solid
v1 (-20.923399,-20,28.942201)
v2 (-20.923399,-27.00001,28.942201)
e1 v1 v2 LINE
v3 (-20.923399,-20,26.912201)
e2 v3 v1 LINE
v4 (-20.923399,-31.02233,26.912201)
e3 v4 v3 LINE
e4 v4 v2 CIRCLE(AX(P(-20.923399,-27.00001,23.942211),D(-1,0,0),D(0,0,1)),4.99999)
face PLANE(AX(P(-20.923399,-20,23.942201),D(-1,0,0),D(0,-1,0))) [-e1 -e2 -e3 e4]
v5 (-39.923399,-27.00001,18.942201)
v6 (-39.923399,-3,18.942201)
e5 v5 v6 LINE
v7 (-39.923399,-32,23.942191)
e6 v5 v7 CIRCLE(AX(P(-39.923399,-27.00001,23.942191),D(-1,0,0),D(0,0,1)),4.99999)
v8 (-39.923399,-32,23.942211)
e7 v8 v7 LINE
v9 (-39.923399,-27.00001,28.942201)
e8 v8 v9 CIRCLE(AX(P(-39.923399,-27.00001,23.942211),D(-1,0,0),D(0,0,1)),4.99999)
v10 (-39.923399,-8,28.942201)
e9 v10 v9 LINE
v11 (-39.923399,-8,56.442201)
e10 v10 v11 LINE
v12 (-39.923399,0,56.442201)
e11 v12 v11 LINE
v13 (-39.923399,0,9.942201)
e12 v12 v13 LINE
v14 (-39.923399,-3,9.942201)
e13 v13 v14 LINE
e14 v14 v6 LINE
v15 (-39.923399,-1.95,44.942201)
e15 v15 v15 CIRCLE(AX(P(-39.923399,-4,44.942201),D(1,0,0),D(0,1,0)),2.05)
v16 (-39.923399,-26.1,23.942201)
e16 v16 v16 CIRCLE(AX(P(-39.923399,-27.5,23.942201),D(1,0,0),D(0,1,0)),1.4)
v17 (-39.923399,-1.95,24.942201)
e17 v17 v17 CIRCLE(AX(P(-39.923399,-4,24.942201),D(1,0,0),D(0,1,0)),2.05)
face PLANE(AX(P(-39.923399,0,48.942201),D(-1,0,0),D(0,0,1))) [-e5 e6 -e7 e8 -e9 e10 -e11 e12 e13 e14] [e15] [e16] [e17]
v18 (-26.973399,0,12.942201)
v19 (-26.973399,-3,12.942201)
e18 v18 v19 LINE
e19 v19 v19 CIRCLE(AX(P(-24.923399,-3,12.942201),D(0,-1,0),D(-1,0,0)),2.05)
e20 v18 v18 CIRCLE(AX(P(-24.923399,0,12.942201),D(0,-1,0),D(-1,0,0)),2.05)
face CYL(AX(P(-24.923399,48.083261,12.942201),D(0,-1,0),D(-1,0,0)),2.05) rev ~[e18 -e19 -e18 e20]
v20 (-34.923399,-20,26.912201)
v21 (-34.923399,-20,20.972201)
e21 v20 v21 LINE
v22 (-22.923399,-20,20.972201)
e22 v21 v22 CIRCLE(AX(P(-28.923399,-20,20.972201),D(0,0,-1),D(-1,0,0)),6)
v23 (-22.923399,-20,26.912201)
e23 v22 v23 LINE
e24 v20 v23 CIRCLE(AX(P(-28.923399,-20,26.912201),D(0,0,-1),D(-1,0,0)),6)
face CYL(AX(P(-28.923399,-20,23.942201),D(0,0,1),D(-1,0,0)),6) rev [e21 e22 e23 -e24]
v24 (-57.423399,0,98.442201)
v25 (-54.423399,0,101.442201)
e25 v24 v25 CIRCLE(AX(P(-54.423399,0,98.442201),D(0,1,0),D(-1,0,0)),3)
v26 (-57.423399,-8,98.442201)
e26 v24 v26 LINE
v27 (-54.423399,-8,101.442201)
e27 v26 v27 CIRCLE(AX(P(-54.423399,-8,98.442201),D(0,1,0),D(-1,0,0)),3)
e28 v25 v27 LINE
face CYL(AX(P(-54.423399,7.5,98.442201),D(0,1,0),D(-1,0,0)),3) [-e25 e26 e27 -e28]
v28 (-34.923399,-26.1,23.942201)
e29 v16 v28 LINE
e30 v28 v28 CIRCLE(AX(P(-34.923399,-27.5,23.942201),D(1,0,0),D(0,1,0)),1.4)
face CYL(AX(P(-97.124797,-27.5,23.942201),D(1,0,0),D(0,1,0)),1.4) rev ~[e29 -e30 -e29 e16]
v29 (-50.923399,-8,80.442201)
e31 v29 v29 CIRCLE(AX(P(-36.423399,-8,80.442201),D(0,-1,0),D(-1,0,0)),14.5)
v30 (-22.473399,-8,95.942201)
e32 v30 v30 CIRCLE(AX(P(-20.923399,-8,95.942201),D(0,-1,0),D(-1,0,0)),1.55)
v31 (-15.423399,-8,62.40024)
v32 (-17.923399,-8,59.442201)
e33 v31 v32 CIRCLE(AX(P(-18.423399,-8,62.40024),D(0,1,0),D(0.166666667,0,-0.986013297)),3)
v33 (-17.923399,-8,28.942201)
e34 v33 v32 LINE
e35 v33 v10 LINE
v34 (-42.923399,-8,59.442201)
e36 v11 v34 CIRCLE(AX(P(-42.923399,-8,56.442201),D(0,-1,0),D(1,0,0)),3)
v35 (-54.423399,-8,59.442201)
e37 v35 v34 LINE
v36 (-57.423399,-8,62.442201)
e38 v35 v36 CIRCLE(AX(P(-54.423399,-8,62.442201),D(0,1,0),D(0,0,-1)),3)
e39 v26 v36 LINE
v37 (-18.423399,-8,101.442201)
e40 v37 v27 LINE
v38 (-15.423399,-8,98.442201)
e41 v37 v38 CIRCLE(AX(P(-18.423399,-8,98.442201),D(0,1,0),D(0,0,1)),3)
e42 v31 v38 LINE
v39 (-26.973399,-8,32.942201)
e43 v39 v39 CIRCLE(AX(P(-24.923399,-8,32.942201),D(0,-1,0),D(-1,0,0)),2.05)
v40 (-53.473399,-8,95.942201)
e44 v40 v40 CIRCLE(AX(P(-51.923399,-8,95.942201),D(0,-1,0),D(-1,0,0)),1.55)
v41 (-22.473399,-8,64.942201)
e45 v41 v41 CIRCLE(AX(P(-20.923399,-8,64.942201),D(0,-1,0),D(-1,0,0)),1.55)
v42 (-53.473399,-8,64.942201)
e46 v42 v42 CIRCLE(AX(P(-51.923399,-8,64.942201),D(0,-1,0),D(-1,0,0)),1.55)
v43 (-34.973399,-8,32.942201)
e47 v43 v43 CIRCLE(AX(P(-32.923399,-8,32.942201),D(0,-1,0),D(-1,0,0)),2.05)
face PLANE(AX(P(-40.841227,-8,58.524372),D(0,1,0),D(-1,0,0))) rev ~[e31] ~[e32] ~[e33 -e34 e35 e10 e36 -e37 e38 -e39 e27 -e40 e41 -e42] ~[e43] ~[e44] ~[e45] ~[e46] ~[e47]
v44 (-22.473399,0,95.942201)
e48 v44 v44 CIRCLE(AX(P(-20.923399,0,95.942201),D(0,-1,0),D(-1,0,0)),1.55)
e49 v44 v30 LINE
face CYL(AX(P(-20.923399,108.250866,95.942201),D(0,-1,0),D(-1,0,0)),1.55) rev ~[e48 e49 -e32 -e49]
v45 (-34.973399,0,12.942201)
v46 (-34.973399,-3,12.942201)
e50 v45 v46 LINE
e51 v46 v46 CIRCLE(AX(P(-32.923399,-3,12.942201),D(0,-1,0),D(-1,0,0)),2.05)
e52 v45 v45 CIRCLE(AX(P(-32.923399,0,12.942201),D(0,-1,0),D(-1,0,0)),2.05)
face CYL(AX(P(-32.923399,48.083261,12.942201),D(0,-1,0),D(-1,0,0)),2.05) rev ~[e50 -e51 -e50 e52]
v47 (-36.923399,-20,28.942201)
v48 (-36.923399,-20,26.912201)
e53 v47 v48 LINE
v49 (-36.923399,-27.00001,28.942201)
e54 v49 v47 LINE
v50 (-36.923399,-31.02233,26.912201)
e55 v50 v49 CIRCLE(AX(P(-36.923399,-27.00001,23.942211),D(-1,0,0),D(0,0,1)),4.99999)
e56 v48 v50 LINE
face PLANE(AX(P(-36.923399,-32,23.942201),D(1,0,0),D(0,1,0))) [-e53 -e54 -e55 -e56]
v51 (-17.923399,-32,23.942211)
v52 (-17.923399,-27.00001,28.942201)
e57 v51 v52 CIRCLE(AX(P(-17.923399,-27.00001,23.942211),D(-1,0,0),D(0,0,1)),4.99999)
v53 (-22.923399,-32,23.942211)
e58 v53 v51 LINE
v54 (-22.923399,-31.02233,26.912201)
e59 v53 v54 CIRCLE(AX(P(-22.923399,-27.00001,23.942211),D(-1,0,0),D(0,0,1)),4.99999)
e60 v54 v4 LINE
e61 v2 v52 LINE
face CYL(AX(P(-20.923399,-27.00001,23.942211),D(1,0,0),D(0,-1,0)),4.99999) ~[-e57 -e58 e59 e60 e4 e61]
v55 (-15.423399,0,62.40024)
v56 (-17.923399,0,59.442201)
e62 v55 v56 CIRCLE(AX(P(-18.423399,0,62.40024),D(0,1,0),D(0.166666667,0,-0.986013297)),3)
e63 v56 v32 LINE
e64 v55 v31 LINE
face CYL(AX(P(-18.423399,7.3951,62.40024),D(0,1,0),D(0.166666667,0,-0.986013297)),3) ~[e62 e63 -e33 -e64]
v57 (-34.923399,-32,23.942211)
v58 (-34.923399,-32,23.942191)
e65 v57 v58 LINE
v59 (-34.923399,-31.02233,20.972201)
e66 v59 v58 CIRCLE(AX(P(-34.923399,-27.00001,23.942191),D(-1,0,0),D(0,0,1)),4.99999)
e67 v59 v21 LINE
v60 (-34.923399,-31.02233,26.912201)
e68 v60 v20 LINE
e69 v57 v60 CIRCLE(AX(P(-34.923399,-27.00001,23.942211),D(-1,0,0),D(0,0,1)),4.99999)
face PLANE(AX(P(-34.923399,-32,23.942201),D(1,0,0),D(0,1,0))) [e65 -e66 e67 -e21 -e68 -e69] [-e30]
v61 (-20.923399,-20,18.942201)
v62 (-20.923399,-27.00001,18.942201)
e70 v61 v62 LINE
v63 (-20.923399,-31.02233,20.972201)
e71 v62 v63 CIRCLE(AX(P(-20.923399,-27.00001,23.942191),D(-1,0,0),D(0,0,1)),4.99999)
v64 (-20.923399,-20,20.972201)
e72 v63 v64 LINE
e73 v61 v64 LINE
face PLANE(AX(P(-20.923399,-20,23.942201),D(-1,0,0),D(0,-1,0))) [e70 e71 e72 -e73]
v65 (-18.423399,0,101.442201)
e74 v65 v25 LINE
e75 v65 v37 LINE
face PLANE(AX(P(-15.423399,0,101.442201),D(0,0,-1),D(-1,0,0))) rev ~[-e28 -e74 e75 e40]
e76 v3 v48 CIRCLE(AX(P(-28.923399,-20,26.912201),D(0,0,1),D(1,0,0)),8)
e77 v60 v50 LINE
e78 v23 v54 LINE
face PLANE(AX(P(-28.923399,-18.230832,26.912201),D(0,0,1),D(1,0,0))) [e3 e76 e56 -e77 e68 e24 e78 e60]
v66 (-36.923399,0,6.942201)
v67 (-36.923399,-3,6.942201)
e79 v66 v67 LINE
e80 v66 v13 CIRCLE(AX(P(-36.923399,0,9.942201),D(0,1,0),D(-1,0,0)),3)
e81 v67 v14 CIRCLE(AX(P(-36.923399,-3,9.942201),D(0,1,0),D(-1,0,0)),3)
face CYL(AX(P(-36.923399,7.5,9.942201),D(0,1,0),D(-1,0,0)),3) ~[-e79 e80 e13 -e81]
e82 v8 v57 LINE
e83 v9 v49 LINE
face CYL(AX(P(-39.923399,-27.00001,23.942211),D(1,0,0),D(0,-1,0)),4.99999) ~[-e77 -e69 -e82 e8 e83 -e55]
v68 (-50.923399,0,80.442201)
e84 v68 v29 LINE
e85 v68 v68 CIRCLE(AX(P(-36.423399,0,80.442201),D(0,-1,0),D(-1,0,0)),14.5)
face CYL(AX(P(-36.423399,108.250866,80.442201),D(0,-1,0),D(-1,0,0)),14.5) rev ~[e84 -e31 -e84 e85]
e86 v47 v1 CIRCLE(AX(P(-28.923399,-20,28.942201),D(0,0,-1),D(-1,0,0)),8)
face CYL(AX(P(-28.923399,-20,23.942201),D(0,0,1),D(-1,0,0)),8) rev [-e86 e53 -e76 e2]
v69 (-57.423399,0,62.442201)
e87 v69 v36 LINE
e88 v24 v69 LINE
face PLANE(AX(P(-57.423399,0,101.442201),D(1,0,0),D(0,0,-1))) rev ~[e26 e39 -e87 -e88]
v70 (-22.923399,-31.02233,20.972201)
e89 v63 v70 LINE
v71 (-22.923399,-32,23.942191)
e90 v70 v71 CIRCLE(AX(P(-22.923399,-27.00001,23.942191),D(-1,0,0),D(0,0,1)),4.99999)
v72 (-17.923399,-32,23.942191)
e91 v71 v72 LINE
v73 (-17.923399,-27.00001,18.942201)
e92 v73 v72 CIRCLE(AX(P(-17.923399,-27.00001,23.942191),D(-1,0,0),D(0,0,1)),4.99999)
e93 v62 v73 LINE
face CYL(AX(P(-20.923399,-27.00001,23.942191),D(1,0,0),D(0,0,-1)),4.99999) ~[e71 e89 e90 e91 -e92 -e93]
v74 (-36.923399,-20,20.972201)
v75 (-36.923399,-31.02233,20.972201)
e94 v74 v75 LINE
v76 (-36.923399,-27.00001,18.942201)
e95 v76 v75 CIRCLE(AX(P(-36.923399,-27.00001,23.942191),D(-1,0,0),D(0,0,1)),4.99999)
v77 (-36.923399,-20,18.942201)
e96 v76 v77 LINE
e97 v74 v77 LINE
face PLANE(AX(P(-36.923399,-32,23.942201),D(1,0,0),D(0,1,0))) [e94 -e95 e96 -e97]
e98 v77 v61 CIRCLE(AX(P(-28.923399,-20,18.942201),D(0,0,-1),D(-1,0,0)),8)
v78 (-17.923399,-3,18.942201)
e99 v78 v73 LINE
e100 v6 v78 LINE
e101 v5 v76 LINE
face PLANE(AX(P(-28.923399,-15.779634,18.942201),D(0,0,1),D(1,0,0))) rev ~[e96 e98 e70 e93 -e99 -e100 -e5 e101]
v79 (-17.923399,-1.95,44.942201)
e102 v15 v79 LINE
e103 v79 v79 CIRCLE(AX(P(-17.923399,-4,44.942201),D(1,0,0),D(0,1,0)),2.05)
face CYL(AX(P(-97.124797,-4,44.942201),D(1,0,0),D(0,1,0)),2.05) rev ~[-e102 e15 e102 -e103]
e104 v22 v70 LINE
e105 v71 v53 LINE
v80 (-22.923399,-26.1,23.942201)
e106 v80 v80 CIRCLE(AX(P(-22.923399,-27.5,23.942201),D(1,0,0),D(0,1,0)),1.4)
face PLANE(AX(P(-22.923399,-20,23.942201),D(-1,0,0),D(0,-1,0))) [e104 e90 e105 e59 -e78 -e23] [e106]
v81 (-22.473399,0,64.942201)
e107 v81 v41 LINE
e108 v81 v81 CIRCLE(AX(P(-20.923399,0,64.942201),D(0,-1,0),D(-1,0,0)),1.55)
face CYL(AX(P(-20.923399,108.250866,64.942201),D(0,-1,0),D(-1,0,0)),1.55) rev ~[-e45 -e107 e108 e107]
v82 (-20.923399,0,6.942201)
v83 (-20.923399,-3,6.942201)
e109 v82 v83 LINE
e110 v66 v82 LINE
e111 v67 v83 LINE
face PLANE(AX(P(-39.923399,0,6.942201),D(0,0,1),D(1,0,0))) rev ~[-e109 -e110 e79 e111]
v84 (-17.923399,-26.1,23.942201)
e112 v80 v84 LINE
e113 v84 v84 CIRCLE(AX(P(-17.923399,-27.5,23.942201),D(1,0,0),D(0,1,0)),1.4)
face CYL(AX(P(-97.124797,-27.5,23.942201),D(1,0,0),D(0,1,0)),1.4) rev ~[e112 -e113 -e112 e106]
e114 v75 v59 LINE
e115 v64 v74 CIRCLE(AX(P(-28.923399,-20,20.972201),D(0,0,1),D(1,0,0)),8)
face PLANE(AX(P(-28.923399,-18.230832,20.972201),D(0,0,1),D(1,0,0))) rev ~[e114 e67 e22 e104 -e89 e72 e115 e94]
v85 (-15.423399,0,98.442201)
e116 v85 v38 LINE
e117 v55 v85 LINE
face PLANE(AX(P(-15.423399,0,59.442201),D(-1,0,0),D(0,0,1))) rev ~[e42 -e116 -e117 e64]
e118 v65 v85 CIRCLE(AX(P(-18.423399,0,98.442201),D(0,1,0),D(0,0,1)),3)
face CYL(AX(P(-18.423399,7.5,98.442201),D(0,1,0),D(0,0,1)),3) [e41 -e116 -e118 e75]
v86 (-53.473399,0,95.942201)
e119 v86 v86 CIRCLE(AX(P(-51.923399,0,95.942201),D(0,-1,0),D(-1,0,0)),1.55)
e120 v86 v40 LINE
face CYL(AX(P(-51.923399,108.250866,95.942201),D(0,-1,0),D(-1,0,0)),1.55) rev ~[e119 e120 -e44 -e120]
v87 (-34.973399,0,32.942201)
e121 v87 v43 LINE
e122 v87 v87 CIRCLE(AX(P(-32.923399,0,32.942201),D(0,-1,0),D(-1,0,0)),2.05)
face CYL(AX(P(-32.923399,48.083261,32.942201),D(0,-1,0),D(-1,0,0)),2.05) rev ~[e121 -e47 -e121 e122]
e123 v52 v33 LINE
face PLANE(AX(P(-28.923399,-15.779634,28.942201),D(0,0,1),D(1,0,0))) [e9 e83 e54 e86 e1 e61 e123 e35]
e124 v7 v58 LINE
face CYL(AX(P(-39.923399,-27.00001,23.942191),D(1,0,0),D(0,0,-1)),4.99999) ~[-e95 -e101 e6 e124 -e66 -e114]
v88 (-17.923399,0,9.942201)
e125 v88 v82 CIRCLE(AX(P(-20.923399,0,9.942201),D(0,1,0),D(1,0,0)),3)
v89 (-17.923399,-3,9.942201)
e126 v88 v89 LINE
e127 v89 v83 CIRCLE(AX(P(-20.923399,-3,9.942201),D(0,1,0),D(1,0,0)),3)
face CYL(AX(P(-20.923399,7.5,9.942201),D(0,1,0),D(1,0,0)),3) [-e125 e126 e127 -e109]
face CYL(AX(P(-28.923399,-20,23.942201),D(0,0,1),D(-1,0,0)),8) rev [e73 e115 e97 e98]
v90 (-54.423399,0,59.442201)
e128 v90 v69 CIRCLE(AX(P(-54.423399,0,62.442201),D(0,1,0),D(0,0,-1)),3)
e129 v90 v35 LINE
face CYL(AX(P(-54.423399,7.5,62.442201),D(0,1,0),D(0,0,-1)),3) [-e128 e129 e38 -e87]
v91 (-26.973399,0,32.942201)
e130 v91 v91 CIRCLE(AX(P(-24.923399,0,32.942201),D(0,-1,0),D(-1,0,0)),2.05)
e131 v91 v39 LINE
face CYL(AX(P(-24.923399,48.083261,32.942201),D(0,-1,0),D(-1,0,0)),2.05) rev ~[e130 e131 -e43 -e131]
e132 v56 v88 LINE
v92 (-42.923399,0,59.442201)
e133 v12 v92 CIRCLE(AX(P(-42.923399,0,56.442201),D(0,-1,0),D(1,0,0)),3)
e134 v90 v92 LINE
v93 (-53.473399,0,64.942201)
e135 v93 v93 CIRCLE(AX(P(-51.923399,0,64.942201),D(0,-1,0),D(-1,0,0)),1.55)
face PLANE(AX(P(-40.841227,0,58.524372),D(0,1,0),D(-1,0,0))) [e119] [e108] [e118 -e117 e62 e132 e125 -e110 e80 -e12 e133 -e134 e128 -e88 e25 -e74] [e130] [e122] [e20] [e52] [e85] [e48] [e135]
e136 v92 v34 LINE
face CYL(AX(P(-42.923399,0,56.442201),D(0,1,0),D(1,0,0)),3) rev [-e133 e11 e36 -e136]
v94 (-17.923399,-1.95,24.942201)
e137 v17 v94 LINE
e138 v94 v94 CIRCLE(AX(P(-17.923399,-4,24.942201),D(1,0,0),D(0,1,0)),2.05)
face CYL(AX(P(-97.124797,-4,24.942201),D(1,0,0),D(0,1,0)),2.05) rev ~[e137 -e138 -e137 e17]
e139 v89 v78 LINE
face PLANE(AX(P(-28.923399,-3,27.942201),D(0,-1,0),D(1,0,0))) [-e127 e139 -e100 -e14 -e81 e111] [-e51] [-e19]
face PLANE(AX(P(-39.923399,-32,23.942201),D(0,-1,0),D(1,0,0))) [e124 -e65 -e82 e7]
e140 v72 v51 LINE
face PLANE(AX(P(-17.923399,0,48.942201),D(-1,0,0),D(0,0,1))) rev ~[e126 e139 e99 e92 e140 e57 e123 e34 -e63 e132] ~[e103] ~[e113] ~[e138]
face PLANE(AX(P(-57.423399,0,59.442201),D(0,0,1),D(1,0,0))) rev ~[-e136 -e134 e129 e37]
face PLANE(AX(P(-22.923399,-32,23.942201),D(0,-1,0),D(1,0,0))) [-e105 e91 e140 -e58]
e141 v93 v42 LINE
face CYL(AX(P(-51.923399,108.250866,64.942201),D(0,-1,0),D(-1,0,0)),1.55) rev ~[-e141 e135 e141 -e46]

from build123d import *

# Parameters (mm, degrees)
F0_W          = 22
F0_H          = 42
F1_DEPTH      = 3
F2_W          = 3
F2_H          = 30
F2_W_2        = 5
F3_DEPTH      = 22
F4_D          = 4.1
F7_DEPTH      = 5
F8_DEPTH      = 2.97
F9_R          = 4.99999
F11_D         = 4.1
F12_D         = 2.8
F13_W         = 22
F13_H         = 10.5
F14_DEPTH     = 8
F15_T1_DEPTH  = 8
F15_T3_DEPTH  = 18
F15_T5_DEPTH  = 18
F15_T7_DEPTH  = 22.7901994578
F15_T9_DEPTH  = 23
F15_T11_DEPTH = 23
F15_T13_DEPTH = 23
F16_D         = 29
F17_D         = 3.1


# Not quite as in the source:
# - a fillet or chamfer that OpenCascade refuses, or shapes differently, is made with other operations: its cross-section is extruded or revolved along the edge and cut away or added
# - a fillet or chamfer is up to 0.001 mm smaller than in the source, because OpenCascade refuses the exact size


with BuildPart() as f1:
    # F0 (on Front) → F1 (new body)
    with BuildSketch(Plane.XZ):
        with Locations((-28.9233987555, 27.9422005266)):
            Rectangle(F0_W, F0_H)
    extrude(amount=F1_DEPTH)

    # F2 (on face) → F3 (join)
    with BuildSketch(Plane(origin=(-39.9233987555, 0, 0), x_dir=(0, -1, 0), z_dir=(-1, 0, 0))):
        with Locations((1.5, 33.9422005266)):
            Rectangle(F2_W, F2_H)
        with Locations((5.5, 33.9422005266)):
            Rectangle(F2_W_2, F2_H)
    extrude(amount=-F3_DEPTH)

    # F4 (through all)
    with Locations(Plane(origin=(0, 0, 0), x_dir=(1, 0, 0), z_dir=(0, 1, 0))):
        with Locations((-24.9233987555, -12.9422005266), (-32.9233987555, -12.9422005266), (-32.9233987555, -32.9422005266), (-24.9233987555, -32.9422005266)):
            Hole(F4_D / 2)

    # F6 (on line) → F7 (join, symmetric)
    with BuildSketch(Plane.XY.offset(23.9422005266)):
        with BuildLine():
            ThreePointArc((-36.9233987555, -20), (-28.9233987555, -12), (-20.9233987555, -20))
            Line((-20.9233987555, -20), (-20.9233987555, -32))
            Line((-20.9233987555, -32), (-17.9233987555, -32))
            Line((-17.9233987555, -32), (-17.9233987555, 0))
            Line((-17.9233987555, 0), (-39.9233987555, 0))
            Line((-39.9233987555, 0), (-39.9233987555, -32))
            Line((-39.9233987555, -32), (-36.9233987555, -32))
            Line((-36.9233987555, -32), (-36.9233987555, -20))
        make_face()
    extrude(amount=F7_DEPTH, both=True)

    # F6 (on line) → F8 (join, symmetric)
    with BuildSketch(Plane.XY.offset(23.9422005266)):
        with BuildLine():
            ThreePointArc((-34.9233987555, -20), (-28.9233987555, -14), (-22.9233987555, -20))
            Line((-22.9233987555, -20), (-22.9233987555, -25.2915026221))
            ThreePointArc((-22.9233987555, -25.2915026221), (-21.4400839819, -22.8284271247), (-20.9233987555, -20))
            ThreePointArc((-20.9233987555, -20), (-28.9233987555, -12), (-36.9233987555, -20))
            ThreePointArc((-36.9233987555, -20), (-36.406713529, -22.8284271247), (-34.9233987555, -25.2915026221))
            Line((-34.9233987555, -25.2915026221), (-34.9233987555, -20))
        make_face()
        with BuildLine():
            Line((-34.9233987555, -32), (-34.9233987555, -25.2915026221))
            ThreePointArc((-34.9233987555, -25.2915026221), (-36.406713529, -22.8284271247), (-36.9233987555, -20))
            Line((-36.9233987555, -20), (-36.9233987555, -32))
            Line((-36.9233987555, -32), (-34.9233987555, -32))
        make_face()
        with BuildLine():
            ThreePointArc((-20.9233987555, -20), (-21.4400839819, -22.8284271247), (-22.9233987555, -25.2915026221))
            Line((-22.9233987555, -25.2915026221), (-22.9233987555, -32))
            Line((-22.9233987555, -32), (-20.9233987555, -32))
            Line((-20.9233987555, -32), (-20.9233987555, -20))
        make_face()
    extrude(amount=F8_DEPTH, both=True)

    # F9 (radius 5 in the source; OpenCascade refuses exactly that, so slightly less here)
    f9_edges = [f1.edges().sort_by_distance(p)[0] for p in [
        (-38.423399, -32, 28.942201),
        (-38.423399, -32, 18.942201),
        (-19.423399, -32, 18.942201),
        (-19.423399, -32, 28.942201),
    ]]
    fillet(f9_edges, radius=F9_R)

    # F11 (through all)
    with Locations(Plane(origin=(-39.9233987555, 0, 0), x_dir=(0, -1, 0), z_dir=(-1, 0, 0))):
        with Locations((4, 44.9422005266), (4, 24.9422005266)):
            Hole(F11_D / 2)

    # F12 (through all)
    with Locations(Plane(origin=(-39.9233987555, 0, 0), x_dir=(0, -1, 0), z_dir=(-1, 0, 0))):
        with Locations((27.5, 23.9422005266)):
            Hole(F12_D / 2)

    # F13 (on Front) → F14 (join)
    with BuildSketch(Plane.XZ):
        Polygon((-57.4233987555, 59.4422005266), (-39.9233987555, 59.4422005266), (-17.9233987555, 59.4422005266), (-15.4233987555, 59.4422005266), (-15.4233987555, 101.4422005266), (-57.4233987555, 101.4422005266), align=None)
        with Locations((-28.9233987555, 54.1922005266)):
            Rectangle(F13_W, F13_H)
    extrude(amount=F14_DEPTH)

    # F15: fillet of radius 3 on 7 edges, made by hand

    # F15_s2 → F15_t1 (join)
    with BuildSketch(Plane.XZ):
        with BuildLine():
            ThreePointArc((-39.9233987555, 56.4422005266), (-40.8020784119, 58.5635208702), (-42.9233987555, 59.4422005266))
            Line((-42.9233987555, 59.4422005266), (-39.9233987555, 59.4422005266))
            Line((-39.9233987555, 59.4422005266), (-39.9233987555, 56.4422005266))
        make_face()
    extrude(amount=F15_T1_DEPTH)

    # F15_s4 → F15_t3 (cut)
    with BuildSketch(Plane.XZ.offset(-7.5)):
        with BuildLine():
            ThreePointArc((-39.9233987555, 9.9422005266), (-39.0447190991, 7.820880183), (-36.9233987555, 6.9422005266))
            Line((-36.9233987555, 6.9422005266), (-39.9233987555, 6.9422005266))
            Line((-39.9233987555, 6.9422005266), (-39.9233987555, 9.9422005266))
        make_face()
    extrude(amount=F15_T3_DEPTH, mode=Mode.SUBTRACT)

    # F15_s6 → F15_t5 (cut)
    with BuildSketch(Plane.XZ.offset(-7.5)):
        with BuildLine():
            ThreePointArc((-17.9233987555, 9.9422005266), (-18.8020784119, 7.820880183), (-20.9233987555, 6.9422005266))
            Line((-20.9233987555, 6.9422005266), (-17.9233987555, 6.9422005266))
            Line((-17.9233987555, 6.9422005266), (-17.9233987555, 9.9422005266))
        make_face()
    extrude(amount=F15_T5_DEPTH, mode=Mode.SUBTRACT)

    # F15_s8 → F15_t7 (cut)
    with BuildSketch(Plane.XZ.offset(-7.3950997289)):
        with BuildLine():
            ThreePointArc((-17.9233987555, 59.4422005266), (-16.132110908, 60.463748745), (-15.4233987555, 62.4002404181))
            Line((-15.4233987555, 62.4002404181), (-15.4233987555, 59.4422005266))
            Line((-15.4233987555, 59.4422005266), (-17.9233987555, 59.4422005266))
        make_face()
    extrude(amount=F15_T7_DEPTH, mode=Mode.SUBTRACT)

    # F15_s10 → F15_t9 (cut)
    with BuildSketch(Plane.XZ.offset(-7.5)):
        with BuildLine():
            ThreePointArc((-18.4233987555, 101.4422005266), (-16.3020784119, 100.5635208702), (-15.4233987555, 98.4422005266))
            Line((-15.4233987555, 98.4422005266), (-15.4233987555, 101.4422005266))
            Line((-15.4233987555, 101.4422005266), (-18.4233987555, 101.4422005266))
        make_face()
    extrude(amount=F15_T9_DEPTH, mode=Mode.SUBTRACT)

    # F15_s12 → F15_t11 (cut)
    with BuildSketch(Plane.XZ.offset(-7.5)):
        with BuildLine():
            ThreePointArc((-57.4233987555, 98.4422005266), (-56.5447190991, 100.5635208702), (-54.4233987555, 101.4422005266))
            Line((-54.4233987555, 101.4422005266), (-57.4233987555, 101.4422005266))
            Line((-57.4233987555, 101.4422005266), (-57.4233987555, 98.4422005266))
        make_face()
    extrude(amount=F15_T11_DEPTH, mode=Mode.SUBTRACT)

    # F15_s14 → F15_t13 (cut)
    with BuildSketch(Plane.XZ.offset(-7.5)):
        with BuildLine():
            ThreePointArc((-54.4233987555, 59.4422005266), (-56.5447190991, 60.320880183), (-57.4233987555, 62.4422005266))
            Line((-57.4233987555, 62.4422005266), (-57.4233987555, 59.4422005266))
            Line((-57.4233987555, 59.4422005266), (-54.4233987555, 59.4422005266))
        make_face()
    extrude(amount=F15_T13_DEPTH, mode=Mode.SUBTRACT)

    # F16 (through all)
    with Locations(Plane(origin=(0, 0, 0), x_dir=(1, 0, 0), z_dir=(0, 1, 0))):
        with Locations((-36.4233987555, -80.4422005266)):
            Hole(F16_D / 2)

    # F17 (through all)
    with Locations(Plane(origin=(0, 0, 0), x_dir=(1, 0, 0), z_dir=(0, 1, 0))):
        with Locations((-51.9233987555, -95.9422005266), (-20.9233987555, -95.9422005266), (-20.9233987555, -64.9422005266), (-51.9233987555, -64.9422005266)):
            Hole(F17_D / 2)


solid = f1.part
